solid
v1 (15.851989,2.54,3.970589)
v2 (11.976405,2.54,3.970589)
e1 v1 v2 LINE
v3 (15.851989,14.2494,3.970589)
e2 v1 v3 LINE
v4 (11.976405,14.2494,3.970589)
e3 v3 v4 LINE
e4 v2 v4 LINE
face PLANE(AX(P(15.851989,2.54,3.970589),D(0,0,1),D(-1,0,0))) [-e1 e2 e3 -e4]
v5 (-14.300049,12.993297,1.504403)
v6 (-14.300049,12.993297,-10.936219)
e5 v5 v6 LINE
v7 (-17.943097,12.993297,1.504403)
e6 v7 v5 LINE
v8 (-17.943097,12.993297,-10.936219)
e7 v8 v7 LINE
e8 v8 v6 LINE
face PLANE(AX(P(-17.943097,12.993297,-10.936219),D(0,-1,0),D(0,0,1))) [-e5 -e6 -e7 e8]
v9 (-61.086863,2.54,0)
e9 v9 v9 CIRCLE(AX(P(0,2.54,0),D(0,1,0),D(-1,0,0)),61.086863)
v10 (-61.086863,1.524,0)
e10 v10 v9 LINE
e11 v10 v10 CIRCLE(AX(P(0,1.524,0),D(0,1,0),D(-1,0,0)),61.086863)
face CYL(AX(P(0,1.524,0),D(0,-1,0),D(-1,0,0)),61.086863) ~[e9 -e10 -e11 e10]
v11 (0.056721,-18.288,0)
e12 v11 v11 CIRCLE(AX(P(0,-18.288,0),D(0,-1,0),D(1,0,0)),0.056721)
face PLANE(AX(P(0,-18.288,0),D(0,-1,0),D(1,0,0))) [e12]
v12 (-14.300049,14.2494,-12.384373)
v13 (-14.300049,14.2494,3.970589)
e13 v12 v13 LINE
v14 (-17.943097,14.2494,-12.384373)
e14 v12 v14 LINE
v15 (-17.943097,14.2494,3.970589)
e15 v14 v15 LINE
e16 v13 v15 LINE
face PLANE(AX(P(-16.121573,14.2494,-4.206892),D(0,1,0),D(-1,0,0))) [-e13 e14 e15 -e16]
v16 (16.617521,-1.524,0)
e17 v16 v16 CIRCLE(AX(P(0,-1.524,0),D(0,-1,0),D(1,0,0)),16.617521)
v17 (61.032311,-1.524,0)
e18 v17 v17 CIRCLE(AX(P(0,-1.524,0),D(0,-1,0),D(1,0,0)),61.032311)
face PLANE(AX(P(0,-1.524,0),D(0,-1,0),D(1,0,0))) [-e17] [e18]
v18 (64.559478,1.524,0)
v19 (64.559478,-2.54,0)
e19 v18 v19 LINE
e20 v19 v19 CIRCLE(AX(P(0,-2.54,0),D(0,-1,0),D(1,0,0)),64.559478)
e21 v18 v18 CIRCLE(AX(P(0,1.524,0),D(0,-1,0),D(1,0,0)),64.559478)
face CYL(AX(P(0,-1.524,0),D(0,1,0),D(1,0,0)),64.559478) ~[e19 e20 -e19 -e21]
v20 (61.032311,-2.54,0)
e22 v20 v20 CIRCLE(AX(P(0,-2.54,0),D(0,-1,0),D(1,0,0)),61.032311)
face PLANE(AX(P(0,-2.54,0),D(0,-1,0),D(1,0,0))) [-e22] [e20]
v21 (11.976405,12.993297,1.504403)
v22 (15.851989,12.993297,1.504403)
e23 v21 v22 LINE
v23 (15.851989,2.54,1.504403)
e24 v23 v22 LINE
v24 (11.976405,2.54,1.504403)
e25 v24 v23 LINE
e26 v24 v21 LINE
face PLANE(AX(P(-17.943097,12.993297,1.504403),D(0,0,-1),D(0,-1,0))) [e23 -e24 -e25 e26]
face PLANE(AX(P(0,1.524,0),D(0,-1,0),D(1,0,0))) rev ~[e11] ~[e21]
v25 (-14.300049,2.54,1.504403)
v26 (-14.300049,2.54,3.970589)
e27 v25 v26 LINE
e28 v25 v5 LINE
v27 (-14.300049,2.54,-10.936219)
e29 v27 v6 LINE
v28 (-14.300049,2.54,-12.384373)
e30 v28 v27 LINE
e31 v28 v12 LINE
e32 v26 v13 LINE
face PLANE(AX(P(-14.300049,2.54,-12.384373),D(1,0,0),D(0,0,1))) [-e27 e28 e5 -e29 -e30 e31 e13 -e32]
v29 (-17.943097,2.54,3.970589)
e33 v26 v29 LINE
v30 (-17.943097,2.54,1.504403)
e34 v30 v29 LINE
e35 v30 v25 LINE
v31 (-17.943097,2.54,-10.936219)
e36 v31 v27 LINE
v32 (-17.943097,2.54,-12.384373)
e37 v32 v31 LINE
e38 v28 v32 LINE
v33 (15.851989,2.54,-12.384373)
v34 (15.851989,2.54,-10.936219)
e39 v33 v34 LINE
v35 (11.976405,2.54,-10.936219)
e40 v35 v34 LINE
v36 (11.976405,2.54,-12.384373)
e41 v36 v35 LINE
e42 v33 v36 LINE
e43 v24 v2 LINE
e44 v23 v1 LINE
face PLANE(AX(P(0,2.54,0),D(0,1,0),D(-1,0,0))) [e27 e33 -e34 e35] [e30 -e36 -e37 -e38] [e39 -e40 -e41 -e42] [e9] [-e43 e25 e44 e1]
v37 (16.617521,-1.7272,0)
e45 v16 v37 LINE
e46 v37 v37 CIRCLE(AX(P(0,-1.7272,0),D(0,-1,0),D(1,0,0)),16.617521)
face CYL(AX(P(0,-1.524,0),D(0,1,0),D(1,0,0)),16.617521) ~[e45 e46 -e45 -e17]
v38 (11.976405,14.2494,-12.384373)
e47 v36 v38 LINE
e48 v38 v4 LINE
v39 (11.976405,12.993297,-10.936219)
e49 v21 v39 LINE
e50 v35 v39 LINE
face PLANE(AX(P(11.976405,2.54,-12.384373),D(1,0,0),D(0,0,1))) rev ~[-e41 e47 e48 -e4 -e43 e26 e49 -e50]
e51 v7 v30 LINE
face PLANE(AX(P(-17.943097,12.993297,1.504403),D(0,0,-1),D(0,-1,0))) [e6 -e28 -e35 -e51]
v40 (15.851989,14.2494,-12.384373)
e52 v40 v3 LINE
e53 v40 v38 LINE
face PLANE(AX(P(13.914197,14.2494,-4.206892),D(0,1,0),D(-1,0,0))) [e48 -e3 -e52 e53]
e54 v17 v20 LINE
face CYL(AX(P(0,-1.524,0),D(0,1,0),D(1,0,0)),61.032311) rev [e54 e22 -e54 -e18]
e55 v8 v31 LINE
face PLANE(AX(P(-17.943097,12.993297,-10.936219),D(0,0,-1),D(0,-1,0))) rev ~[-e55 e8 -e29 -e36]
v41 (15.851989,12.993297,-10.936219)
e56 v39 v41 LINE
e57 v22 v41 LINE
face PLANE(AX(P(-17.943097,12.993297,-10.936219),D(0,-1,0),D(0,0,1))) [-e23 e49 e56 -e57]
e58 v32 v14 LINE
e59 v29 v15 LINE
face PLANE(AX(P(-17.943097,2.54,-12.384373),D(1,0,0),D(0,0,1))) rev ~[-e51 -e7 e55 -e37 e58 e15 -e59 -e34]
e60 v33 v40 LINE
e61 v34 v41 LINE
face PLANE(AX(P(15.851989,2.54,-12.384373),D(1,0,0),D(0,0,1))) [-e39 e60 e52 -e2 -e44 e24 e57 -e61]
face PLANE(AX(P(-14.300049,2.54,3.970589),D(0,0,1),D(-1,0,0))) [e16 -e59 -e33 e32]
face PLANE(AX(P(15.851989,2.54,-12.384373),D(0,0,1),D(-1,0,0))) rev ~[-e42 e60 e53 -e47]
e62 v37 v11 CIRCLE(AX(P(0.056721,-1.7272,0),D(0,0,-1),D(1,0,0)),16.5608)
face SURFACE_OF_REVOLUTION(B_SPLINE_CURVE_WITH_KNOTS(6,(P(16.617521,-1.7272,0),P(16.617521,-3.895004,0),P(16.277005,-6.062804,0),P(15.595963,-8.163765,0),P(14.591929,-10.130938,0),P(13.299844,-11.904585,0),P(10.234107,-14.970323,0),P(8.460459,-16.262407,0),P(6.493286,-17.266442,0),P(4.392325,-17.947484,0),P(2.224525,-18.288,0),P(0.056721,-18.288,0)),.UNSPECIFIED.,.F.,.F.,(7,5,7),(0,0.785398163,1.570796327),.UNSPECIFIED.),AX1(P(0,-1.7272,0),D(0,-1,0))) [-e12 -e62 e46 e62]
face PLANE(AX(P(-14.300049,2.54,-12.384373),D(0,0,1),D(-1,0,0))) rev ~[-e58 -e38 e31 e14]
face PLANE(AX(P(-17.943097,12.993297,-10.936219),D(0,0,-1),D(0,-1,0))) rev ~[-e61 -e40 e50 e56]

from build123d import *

# Parameters (mm, degrees)
F0_R      = 64.5594783813
F1_DEPTH  = 1.524
F2_R      = 64.5594783813
F2_R_2    = 61.0323113023
F3_DEPTH  = 1.016
F4_R      = 16.6175214607
F5_DEPTH  = 16.764
F6_R      = 16.5608
F7_R      = 61.0868628562
F8_DEPTH  = 1.016
F13_W     = 3.8755843416
F13_H     = 16.3549613208
F13_W_2   = 3.6430479959
F14_DEPTH = 11.7094
F15_W     = 10.4532966083
F15_H     = 12.4406219693
F16_DEPTH = 37.6174


# Not quite as in the source:
# - the program builds the solid bodies; features that only make, move or delete a surface that nothing else refers to are left out


with BuildPart() as f1:
    # F0 (on Front) → F1 (new body, symmetric)
    with BuildSketch(Plane.XZ):
        Circle(F0_R)
    extrude(amount=F1_DEPTH, both=True)

    # F2 (on face) → F3 (join)
    with BuildSketch(Plane.XZ.offset(1.524)):
        Circle(F2_R)
        Circle(F2_R_2, mode=Mode.SUBTRACT)
    extrude(amount=F3_DEPTH)

    # F4 (on face) → F5 (join)
    with BuildSketch(Plane.XZ.offset(1.524)):
        Circle(F4_R)
    extrude(amount=F5_DEPTH)

    # F6
    f6_edges = [f1.edges().sort_by_distance(p)[0] for p in [
        (-16.617521, -18.288, 0),
    ]]
    fillet(f6_edges, radius=F6_R)

    # F7 (on face) → F8 (join)
    with BuildSketch(Plane(origin=(0, 1.524, 0), x_dir=(-1, 0, 0), z_dir=(0, 1, 0))):
        Circle(F7_R)
    extrude(amount=F8_DEPTH)

    # F13 (on face) → F14 (join)
    with BuildSketch(Plane(origin=(0, 2.54, 0), x_dir=(-1, 0, 0), z_dir=(0, 1, 0))):
        with Locations((-13.9141972177, -4.206892103)):
            Rectangle(F13_W, F13_H)
        with Locations((16.1215732805, -4.206892103)):
            Rectangle(F13_W_2, F13_H)
    extrude(amount=F14_DEPTH)

    # F15 (on face) → F16 (cut)
    with BuildSketch(Plane(origin=(-17.9430972785, 0, 0), x_dir=(0, -1, 0), z_dir=(-1, 0, 0))):
        with Locations((-7.7666483042, -4.7159082606)):
            Rectangle(F15_W, F15_H)
    extrude(amount=-F16_DEPTH, mode=Mode.SUBTRACT)


solid = f1.part
